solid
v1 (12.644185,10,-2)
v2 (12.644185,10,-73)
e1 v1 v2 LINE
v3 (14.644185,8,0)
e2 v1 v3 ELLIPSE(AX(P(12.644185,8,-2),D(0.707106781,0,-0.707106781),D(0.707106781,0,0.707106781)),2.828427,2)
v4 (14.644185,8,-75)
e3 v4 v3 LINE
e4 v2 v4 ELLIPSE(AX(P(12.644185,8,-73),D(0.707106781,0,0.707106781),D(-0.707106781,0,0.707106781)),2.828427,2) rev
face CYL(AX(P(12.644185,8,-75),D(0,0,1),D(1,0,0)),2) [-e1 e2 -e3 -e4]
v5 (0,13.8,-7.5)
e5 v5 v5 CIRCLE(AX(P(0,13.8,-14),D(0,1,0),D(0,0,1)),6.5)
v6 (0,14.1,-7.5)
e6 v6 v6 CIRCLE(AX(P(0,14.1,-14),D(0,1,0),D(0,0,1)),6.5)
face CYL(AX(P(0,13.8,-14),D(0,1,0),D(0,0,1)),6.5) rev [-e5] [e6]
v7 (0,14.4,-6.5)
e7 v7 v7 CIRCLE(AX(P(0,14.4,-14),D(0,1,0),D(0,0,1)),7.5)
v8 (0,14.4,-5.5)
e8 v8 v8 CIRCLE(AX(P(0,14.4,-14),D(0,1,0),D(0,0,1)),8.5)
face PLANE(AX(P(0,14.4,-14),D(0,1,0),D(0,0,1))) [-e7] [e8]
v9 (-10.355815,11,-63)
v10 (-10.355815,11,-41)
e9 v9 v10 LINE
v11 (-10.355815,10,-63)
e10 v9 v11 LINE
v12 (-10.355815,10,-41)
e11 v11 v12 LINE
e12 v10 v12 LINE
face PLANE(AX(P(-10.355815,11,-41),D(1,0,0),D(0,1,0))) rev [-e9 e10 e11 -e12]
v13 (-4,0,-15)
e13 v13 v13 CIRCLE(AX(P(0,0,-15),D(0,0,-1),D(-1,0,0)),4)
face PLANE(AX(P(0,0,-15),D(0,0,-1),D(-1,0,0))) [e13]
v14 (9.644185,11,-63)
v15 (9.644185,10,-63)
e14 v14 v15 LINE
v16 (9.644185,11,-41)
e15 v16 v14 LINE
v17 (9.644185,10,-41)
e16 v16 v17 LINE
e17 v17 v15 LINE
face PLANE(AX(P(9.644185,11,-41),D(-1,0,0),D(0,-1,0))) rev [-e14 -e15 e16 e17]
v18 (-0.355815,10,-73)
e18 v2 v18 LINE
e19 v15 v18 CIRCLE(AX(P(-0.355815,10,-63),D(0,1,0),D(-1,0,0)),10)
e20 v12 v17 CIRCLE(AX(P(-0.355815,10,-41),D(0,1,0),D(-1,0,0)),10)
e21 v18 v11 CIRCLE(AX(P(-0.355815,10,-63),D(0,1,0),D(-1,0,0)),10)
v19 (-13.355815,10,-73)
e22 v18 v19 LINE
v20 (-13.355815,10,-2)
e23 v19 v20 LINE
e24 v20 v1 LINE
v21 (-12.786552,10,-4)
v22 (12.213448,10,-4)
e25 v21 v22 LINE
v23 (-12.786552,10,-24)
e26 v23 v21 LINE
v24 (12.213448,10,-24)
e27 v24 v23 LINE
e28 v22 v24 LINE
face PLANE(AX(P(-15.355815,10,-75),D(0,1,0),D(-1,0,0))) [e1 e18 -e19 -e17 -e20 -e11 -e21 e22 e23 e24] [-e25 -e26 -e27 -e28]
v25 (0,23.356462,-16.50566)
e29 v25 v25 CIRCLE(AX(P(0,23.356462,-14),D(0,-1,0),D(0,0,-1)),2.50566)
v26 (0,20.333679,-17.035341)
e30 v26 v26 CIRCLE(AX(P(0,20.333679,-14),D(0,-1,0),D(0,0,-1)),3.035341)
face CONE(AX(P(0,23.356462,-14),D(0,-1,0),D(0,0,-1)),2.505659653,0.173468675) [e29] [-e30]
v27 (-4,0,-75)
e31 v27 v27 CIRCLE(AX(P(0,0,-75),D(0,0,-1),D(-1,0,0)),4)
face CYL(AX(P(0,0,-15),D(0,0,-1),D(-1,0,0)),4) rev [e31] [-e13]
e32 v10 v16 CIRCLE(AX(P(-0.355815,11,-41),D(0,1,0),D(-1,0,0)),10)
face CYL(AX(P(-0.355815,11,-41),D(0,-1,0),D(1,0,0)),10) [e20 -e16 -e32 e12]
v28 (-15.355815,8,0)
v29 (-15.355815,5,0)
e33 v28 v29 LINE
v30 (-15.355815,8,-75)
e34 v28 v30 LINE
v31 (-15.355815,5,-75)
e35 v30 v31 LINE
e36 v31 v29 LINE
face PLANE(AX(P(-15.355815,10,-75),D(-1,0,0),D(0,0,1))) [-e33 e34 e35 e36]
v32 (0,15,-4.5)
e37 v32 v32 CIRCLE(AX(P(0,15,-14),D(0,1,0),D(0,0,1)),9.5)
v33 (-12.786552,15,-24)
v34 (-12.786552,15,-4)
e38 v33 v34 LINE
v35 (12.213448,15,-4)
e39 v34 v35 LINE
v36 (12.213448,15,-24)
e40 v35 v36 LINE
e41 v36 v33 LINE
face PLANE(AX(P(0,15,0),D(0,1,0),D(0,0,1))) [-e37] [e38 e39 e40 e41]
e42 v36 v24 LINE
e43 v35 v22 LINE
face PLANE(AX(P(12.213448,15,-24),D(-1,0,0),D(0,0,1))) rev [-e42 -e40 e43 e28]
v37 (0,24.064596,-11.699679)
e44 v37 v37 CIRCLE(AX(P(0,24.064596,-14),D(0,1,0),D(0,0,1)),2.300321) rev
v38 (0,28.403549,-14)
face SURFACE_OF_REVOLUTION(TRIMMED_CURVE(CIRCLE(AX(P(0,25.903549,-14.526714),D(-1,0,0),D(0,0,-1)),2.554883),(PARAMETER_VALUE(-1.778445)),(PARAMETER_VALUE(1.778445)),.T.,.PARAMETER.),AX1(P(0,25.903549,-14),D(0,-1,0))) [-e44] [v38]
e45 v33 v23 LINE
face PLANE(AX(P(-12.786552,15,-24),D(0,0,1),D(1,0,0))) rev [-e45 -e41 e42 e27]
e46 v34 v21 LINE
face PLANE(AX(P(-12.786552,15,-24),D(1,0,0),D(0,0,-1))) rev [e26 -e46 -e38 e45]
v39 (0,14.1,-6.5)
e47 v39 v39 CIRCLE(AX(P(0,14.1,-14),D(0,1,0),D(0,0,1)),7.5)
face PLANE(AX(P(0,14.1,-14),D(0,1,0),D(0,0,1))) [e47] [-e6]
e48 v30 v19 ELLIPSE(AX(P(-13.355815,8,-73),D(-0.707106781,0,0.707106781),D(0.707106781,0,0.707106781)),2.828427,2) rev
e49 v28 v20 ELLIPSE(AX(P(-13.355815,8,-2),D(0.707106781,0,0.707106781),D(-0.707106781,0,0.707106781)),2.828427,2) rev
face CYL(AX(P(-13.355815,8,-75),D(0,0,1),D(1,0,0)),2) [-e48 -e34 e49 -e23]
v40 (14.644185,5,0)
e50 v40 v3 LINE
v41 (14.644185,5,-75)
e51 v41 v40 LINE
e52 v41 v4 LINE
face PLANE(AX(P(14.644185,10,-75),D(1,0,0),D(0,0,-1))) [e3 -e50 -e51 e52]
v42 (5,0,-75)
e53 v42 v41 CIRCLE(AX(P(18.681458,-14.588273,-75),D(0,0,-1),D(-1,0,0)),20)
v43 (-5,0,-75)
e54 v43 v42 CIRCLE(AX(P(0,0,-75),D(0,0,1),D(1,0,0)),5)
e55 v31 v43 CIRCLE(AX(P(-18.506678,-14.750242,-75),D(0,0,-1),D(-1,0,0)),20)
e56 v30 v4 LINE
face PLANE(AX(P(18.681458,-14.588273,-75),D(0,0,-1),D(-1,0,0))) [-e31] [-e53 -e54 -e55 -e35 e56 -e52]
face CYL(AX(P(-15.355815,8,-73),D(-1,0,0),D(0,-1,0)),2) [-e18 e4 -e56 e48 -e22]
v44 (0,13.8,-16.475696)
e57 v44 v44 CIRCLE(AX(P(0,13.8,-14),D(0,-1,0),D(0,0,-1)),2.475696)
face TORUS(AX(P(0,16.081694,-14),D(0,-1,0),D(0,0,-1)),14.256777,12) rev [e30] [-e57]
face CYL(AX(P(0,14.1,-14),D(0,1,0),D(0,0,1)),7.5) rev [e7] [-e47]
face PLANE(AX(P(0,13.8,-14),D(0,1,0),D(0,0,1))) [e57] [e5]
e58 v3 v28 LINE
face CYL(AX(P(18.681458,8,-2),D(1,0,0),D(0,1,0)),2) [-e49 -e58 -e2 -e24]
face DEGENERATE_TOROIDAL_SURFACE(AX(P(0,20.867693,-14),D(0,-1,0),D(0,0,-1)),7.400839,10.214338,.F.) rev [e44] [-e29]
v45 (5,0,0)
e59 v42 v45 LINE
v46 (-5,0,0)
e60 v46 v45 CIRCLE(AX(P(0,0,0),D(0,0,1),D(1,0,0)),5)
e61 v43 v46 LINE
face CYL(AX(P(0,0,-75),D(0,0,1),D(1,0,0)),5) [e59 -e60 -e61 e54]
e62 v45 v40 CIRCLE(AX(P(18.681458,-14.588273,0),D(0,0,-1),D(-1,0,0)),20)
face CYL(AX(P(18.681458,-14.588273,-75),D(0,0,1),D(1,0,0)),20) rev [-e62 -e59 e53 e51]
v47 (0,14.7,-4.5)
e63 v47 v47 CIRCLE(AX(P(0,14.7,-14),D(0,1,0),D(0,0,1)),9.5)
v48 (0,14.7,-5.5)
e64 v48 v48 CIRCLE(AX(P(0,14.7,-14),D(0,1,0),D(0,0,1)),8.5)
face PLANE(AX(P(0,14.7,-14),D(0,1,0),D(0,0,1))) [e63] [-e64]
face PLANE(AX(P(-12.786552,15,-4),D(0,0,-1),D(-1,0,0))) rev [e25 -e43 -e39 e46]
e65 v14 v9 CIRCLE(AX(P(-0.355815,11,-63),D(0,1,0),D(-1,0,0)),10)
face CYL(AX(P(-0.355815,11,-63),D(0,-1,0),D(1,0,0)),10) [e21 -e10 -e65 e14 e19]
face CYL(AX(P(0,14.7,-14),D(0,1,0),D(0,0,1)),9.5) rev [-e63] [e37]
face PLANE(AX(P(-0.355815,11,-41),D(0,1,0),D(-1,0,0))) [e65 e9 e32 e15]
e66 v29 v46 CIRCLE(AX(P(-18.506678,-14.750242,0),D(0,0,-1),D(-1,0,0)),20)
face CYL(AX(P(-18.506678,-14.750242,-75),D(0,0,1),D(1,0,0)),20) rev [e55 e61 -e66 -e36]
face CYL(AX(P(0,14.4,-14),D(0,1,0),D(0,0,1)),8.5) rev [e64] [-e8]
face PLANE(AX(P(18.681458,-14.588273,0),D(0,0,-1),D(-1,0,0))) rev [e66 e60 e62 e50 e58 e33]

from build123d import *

# Parameters (mm, degrees)
BOSS_EXTRUDE2_DEPTH = 75
SKETCH2_R           = 4
CUT_EXTRUDE1_DEPTH  = 60
BOSS_EXTRUDE3_DEPTH = 1
SKETCH4_W           = 25
SKETCH4_H           = 20
BOSS_EXTRUDE4_DEPTH = 5
SKETCH5_R           = 9.5
CUT_EXTRUDE5_DEPTH  = 0.3
SKETCH9_R           = 8.5
CUT_EXTRUDE6_DEPTH  = 0.3
SKETCH10_R          = 7.5
CUT_EXTRUDE7_DEPTH  = 0.3
SKETCH11_R          = 6.5
CUT_EXTRUDE8_DEPTH  = 0.3
FILLET1_R           = 2


with BuildPart() as part:
    # Sketch1 → Boss-Extrude2 (new body)
    with BuildSketch(Plane.XY):
        with BuildLine():
            Line((-15.355814747, 10), (14.644185253, 10))
            Line((14.644185253, 10), (14.644185253, 5))
            ThreePointArc((14.644185253, 5), (9.476114191, 3.167336025), (5, 0))
            ThreePointArc((5, 0), (0, -5), (-5, 0))
            ThreePointArc((-5, 0), (-9.810792775, 3.260354155), (-15.355814747, 5))
            Line((-15.355814747, 5), (-15.355814747, 10))
        make_face()
    extrude(amount=-BOSS_EXTRUDE2_DEPTH)

    # Sketch2 → Cut-Extrude1 (cut)
    with BuildSketch(Plane(origin=(0, 0, -75), x_dir=(-1, 0, 0), z_dir=(0, 0, -1))):
        Circle(SKETCH2_R)
    extrude(amount=-CUT_EXTRUDE1_DEPTH, mode=Mode.SUBTRACT)

    # Sketch3 → Boss-Extrude3 (add)
    with BuildSketch(Plane(origin=(0, 10, 0), x_dir=(1, 0, 0), z_dir=(0, 1, 0))):
        with BuildLine():
            Line((-10.355814747, 41), (-10.355814747, 63))
            ThreePointArc((-10.355814747, 63), (-0.355814747, 73), (9.644185253, 63))
            Line((9.644185253, 63), (9.644185253, 41))
            ThreePointArc((9.644185253, 41), (-0.355814747, 31), (-10.355814747, 41))
        make_face()
    extrude(amount=BOSS_EXTRUDE3_DEPTH)

    # Sketch4 → Boss-Extrude4 (add)
    with BuildSketch(Plane(origin=(0, 10, 0), x_dir=(1, 0, 0), z_dir=(0, 1, 0))):
        with Locations((-0.28655183, 14)):
            Rectangle(SKETCH4_W, SKETCH4_H)
    extrude(amount=BOSS_EXTRUDE4_DEPTH)

    # Sketch5 → Cut-Extrude5 (cut)
    with BuildSketch(Plane(origin=(0, 15, 0), x_dir=(1, 0, 0), z_dir=(0, 1, 0))):
        with Locations(Location((0, 14, 0), (0, 0, 270))):
            Circle(SKETCH5_R)
    extrude(amount=-CUT_EXTRUDE5_DEPTH, mode=Mode.SUBTRACT)

    # Sketch9 → Cut-Extrude6 (cut)
    with BuildSketch(Plane(origin=(0, 14.7, 0), x_dir=(1, 0, 0), z_dir=(0, 1, 0))):
        with Locations(Location((0, 14, 0), (0, 0, 270))):
            Circle(SKETCH9_R)
    extrude(amount=-CUT_EXTRUDE6_DEPTH, mode=Mode.SUBTRACT)

    # Sketch10 → Cut-Extrude7 (cut)
    with BuildSketch(Plane(origin=(0, 14.4, 0), x_dir=(1, 0, 0), z_dir=(0, 1, 0))):
        with Locations(Location((0, 14, 0), (0, 0, 270))):
            Circle(SKETCH10_R)
    extrude(amount=-CUT_EXTRUDE7_DEPTH, mode=Mode.SUBTRACT)

    # Sketch11 → Cut-Extrude8 (cut)
    with BuildSketch(Plane(origin=(0, 14.1, 0), x_dir=(1, 0, 0), z_dir=(0, 1, 0))):
        with Locations(Location((0, 14, 0), (0, 0, 270))):
            Circle(SKETCH11_R)
    extrude(amount=-CUT_EXTRUDE8_DEPTH, mode=Mode.SUBTRACT)

    # Sketch12 → Revolve2 (revolve)
    with BuildSketch(Plane(origin=(0, 0, 0), x_dir=(0, 0, -1), z_dir=(1, 0, 0)), mode=Mode.PRIVATE) as revolve2_sk:
        with BuildLine():
            Line((14, 15), (14, 13.677907374))
            Line((14, 13.677907374), (11.5, 13.677907374))
            ThreePointArc((11.5, 13.677907374), (11.70459363, 17.043778802), (10.964658523, 20.333679266))
            Line((10.964658523, 20.333679266), (11.494340347, 23.356462384))
            ThreePointArc((11.494340347, 23.356462384), (12.09773994, 25.084923792), (13, 26.677907374))
            Line((13, 26.677907374), (14, 26.677907374))
            Line((14, 26.677907374), (14, 15))
        make_face()
    revolve(revolve2_sk.sketch.rotate(Axis((0, 13.677907374, -14), (0, 1, 0)), 180), axis=Axis((0, 13.677907374, -14), (0, 1, 0)))

    # Sketch13 → Revolve3 (revolve)
    with BuildSketch(Plane(origin=(0, 0, 0), x_dir=(0, 0, -1), z_dir=(1, 0, 0))):
        with BuildLine():
            Line((14, 23.403548627), (14, 28.403548627))
            ThreePointArc((14, 28.403548627), (17.081597334, 25.903548627), (14, 23.403548627))
        make_face()
    revolve(axis=Axis((0, 23.403548627, -14), (0, 1, 0)))

    # Fillet1
    fillet1_edges = [part.edges().sort_by_distance(p)[0] for p in [
        (-15.355814747, 10, -37.5),
        (14.644185253, 10, -37.5),
        (-0.355814747, 10, 0),
        (-0.355814747, 10, -75),
    ]]
    fillet(fillet1_edges, radius=FILLET1_R - 0.0001)  # a hair under: the kernel refuses the full size


solid = part.part
